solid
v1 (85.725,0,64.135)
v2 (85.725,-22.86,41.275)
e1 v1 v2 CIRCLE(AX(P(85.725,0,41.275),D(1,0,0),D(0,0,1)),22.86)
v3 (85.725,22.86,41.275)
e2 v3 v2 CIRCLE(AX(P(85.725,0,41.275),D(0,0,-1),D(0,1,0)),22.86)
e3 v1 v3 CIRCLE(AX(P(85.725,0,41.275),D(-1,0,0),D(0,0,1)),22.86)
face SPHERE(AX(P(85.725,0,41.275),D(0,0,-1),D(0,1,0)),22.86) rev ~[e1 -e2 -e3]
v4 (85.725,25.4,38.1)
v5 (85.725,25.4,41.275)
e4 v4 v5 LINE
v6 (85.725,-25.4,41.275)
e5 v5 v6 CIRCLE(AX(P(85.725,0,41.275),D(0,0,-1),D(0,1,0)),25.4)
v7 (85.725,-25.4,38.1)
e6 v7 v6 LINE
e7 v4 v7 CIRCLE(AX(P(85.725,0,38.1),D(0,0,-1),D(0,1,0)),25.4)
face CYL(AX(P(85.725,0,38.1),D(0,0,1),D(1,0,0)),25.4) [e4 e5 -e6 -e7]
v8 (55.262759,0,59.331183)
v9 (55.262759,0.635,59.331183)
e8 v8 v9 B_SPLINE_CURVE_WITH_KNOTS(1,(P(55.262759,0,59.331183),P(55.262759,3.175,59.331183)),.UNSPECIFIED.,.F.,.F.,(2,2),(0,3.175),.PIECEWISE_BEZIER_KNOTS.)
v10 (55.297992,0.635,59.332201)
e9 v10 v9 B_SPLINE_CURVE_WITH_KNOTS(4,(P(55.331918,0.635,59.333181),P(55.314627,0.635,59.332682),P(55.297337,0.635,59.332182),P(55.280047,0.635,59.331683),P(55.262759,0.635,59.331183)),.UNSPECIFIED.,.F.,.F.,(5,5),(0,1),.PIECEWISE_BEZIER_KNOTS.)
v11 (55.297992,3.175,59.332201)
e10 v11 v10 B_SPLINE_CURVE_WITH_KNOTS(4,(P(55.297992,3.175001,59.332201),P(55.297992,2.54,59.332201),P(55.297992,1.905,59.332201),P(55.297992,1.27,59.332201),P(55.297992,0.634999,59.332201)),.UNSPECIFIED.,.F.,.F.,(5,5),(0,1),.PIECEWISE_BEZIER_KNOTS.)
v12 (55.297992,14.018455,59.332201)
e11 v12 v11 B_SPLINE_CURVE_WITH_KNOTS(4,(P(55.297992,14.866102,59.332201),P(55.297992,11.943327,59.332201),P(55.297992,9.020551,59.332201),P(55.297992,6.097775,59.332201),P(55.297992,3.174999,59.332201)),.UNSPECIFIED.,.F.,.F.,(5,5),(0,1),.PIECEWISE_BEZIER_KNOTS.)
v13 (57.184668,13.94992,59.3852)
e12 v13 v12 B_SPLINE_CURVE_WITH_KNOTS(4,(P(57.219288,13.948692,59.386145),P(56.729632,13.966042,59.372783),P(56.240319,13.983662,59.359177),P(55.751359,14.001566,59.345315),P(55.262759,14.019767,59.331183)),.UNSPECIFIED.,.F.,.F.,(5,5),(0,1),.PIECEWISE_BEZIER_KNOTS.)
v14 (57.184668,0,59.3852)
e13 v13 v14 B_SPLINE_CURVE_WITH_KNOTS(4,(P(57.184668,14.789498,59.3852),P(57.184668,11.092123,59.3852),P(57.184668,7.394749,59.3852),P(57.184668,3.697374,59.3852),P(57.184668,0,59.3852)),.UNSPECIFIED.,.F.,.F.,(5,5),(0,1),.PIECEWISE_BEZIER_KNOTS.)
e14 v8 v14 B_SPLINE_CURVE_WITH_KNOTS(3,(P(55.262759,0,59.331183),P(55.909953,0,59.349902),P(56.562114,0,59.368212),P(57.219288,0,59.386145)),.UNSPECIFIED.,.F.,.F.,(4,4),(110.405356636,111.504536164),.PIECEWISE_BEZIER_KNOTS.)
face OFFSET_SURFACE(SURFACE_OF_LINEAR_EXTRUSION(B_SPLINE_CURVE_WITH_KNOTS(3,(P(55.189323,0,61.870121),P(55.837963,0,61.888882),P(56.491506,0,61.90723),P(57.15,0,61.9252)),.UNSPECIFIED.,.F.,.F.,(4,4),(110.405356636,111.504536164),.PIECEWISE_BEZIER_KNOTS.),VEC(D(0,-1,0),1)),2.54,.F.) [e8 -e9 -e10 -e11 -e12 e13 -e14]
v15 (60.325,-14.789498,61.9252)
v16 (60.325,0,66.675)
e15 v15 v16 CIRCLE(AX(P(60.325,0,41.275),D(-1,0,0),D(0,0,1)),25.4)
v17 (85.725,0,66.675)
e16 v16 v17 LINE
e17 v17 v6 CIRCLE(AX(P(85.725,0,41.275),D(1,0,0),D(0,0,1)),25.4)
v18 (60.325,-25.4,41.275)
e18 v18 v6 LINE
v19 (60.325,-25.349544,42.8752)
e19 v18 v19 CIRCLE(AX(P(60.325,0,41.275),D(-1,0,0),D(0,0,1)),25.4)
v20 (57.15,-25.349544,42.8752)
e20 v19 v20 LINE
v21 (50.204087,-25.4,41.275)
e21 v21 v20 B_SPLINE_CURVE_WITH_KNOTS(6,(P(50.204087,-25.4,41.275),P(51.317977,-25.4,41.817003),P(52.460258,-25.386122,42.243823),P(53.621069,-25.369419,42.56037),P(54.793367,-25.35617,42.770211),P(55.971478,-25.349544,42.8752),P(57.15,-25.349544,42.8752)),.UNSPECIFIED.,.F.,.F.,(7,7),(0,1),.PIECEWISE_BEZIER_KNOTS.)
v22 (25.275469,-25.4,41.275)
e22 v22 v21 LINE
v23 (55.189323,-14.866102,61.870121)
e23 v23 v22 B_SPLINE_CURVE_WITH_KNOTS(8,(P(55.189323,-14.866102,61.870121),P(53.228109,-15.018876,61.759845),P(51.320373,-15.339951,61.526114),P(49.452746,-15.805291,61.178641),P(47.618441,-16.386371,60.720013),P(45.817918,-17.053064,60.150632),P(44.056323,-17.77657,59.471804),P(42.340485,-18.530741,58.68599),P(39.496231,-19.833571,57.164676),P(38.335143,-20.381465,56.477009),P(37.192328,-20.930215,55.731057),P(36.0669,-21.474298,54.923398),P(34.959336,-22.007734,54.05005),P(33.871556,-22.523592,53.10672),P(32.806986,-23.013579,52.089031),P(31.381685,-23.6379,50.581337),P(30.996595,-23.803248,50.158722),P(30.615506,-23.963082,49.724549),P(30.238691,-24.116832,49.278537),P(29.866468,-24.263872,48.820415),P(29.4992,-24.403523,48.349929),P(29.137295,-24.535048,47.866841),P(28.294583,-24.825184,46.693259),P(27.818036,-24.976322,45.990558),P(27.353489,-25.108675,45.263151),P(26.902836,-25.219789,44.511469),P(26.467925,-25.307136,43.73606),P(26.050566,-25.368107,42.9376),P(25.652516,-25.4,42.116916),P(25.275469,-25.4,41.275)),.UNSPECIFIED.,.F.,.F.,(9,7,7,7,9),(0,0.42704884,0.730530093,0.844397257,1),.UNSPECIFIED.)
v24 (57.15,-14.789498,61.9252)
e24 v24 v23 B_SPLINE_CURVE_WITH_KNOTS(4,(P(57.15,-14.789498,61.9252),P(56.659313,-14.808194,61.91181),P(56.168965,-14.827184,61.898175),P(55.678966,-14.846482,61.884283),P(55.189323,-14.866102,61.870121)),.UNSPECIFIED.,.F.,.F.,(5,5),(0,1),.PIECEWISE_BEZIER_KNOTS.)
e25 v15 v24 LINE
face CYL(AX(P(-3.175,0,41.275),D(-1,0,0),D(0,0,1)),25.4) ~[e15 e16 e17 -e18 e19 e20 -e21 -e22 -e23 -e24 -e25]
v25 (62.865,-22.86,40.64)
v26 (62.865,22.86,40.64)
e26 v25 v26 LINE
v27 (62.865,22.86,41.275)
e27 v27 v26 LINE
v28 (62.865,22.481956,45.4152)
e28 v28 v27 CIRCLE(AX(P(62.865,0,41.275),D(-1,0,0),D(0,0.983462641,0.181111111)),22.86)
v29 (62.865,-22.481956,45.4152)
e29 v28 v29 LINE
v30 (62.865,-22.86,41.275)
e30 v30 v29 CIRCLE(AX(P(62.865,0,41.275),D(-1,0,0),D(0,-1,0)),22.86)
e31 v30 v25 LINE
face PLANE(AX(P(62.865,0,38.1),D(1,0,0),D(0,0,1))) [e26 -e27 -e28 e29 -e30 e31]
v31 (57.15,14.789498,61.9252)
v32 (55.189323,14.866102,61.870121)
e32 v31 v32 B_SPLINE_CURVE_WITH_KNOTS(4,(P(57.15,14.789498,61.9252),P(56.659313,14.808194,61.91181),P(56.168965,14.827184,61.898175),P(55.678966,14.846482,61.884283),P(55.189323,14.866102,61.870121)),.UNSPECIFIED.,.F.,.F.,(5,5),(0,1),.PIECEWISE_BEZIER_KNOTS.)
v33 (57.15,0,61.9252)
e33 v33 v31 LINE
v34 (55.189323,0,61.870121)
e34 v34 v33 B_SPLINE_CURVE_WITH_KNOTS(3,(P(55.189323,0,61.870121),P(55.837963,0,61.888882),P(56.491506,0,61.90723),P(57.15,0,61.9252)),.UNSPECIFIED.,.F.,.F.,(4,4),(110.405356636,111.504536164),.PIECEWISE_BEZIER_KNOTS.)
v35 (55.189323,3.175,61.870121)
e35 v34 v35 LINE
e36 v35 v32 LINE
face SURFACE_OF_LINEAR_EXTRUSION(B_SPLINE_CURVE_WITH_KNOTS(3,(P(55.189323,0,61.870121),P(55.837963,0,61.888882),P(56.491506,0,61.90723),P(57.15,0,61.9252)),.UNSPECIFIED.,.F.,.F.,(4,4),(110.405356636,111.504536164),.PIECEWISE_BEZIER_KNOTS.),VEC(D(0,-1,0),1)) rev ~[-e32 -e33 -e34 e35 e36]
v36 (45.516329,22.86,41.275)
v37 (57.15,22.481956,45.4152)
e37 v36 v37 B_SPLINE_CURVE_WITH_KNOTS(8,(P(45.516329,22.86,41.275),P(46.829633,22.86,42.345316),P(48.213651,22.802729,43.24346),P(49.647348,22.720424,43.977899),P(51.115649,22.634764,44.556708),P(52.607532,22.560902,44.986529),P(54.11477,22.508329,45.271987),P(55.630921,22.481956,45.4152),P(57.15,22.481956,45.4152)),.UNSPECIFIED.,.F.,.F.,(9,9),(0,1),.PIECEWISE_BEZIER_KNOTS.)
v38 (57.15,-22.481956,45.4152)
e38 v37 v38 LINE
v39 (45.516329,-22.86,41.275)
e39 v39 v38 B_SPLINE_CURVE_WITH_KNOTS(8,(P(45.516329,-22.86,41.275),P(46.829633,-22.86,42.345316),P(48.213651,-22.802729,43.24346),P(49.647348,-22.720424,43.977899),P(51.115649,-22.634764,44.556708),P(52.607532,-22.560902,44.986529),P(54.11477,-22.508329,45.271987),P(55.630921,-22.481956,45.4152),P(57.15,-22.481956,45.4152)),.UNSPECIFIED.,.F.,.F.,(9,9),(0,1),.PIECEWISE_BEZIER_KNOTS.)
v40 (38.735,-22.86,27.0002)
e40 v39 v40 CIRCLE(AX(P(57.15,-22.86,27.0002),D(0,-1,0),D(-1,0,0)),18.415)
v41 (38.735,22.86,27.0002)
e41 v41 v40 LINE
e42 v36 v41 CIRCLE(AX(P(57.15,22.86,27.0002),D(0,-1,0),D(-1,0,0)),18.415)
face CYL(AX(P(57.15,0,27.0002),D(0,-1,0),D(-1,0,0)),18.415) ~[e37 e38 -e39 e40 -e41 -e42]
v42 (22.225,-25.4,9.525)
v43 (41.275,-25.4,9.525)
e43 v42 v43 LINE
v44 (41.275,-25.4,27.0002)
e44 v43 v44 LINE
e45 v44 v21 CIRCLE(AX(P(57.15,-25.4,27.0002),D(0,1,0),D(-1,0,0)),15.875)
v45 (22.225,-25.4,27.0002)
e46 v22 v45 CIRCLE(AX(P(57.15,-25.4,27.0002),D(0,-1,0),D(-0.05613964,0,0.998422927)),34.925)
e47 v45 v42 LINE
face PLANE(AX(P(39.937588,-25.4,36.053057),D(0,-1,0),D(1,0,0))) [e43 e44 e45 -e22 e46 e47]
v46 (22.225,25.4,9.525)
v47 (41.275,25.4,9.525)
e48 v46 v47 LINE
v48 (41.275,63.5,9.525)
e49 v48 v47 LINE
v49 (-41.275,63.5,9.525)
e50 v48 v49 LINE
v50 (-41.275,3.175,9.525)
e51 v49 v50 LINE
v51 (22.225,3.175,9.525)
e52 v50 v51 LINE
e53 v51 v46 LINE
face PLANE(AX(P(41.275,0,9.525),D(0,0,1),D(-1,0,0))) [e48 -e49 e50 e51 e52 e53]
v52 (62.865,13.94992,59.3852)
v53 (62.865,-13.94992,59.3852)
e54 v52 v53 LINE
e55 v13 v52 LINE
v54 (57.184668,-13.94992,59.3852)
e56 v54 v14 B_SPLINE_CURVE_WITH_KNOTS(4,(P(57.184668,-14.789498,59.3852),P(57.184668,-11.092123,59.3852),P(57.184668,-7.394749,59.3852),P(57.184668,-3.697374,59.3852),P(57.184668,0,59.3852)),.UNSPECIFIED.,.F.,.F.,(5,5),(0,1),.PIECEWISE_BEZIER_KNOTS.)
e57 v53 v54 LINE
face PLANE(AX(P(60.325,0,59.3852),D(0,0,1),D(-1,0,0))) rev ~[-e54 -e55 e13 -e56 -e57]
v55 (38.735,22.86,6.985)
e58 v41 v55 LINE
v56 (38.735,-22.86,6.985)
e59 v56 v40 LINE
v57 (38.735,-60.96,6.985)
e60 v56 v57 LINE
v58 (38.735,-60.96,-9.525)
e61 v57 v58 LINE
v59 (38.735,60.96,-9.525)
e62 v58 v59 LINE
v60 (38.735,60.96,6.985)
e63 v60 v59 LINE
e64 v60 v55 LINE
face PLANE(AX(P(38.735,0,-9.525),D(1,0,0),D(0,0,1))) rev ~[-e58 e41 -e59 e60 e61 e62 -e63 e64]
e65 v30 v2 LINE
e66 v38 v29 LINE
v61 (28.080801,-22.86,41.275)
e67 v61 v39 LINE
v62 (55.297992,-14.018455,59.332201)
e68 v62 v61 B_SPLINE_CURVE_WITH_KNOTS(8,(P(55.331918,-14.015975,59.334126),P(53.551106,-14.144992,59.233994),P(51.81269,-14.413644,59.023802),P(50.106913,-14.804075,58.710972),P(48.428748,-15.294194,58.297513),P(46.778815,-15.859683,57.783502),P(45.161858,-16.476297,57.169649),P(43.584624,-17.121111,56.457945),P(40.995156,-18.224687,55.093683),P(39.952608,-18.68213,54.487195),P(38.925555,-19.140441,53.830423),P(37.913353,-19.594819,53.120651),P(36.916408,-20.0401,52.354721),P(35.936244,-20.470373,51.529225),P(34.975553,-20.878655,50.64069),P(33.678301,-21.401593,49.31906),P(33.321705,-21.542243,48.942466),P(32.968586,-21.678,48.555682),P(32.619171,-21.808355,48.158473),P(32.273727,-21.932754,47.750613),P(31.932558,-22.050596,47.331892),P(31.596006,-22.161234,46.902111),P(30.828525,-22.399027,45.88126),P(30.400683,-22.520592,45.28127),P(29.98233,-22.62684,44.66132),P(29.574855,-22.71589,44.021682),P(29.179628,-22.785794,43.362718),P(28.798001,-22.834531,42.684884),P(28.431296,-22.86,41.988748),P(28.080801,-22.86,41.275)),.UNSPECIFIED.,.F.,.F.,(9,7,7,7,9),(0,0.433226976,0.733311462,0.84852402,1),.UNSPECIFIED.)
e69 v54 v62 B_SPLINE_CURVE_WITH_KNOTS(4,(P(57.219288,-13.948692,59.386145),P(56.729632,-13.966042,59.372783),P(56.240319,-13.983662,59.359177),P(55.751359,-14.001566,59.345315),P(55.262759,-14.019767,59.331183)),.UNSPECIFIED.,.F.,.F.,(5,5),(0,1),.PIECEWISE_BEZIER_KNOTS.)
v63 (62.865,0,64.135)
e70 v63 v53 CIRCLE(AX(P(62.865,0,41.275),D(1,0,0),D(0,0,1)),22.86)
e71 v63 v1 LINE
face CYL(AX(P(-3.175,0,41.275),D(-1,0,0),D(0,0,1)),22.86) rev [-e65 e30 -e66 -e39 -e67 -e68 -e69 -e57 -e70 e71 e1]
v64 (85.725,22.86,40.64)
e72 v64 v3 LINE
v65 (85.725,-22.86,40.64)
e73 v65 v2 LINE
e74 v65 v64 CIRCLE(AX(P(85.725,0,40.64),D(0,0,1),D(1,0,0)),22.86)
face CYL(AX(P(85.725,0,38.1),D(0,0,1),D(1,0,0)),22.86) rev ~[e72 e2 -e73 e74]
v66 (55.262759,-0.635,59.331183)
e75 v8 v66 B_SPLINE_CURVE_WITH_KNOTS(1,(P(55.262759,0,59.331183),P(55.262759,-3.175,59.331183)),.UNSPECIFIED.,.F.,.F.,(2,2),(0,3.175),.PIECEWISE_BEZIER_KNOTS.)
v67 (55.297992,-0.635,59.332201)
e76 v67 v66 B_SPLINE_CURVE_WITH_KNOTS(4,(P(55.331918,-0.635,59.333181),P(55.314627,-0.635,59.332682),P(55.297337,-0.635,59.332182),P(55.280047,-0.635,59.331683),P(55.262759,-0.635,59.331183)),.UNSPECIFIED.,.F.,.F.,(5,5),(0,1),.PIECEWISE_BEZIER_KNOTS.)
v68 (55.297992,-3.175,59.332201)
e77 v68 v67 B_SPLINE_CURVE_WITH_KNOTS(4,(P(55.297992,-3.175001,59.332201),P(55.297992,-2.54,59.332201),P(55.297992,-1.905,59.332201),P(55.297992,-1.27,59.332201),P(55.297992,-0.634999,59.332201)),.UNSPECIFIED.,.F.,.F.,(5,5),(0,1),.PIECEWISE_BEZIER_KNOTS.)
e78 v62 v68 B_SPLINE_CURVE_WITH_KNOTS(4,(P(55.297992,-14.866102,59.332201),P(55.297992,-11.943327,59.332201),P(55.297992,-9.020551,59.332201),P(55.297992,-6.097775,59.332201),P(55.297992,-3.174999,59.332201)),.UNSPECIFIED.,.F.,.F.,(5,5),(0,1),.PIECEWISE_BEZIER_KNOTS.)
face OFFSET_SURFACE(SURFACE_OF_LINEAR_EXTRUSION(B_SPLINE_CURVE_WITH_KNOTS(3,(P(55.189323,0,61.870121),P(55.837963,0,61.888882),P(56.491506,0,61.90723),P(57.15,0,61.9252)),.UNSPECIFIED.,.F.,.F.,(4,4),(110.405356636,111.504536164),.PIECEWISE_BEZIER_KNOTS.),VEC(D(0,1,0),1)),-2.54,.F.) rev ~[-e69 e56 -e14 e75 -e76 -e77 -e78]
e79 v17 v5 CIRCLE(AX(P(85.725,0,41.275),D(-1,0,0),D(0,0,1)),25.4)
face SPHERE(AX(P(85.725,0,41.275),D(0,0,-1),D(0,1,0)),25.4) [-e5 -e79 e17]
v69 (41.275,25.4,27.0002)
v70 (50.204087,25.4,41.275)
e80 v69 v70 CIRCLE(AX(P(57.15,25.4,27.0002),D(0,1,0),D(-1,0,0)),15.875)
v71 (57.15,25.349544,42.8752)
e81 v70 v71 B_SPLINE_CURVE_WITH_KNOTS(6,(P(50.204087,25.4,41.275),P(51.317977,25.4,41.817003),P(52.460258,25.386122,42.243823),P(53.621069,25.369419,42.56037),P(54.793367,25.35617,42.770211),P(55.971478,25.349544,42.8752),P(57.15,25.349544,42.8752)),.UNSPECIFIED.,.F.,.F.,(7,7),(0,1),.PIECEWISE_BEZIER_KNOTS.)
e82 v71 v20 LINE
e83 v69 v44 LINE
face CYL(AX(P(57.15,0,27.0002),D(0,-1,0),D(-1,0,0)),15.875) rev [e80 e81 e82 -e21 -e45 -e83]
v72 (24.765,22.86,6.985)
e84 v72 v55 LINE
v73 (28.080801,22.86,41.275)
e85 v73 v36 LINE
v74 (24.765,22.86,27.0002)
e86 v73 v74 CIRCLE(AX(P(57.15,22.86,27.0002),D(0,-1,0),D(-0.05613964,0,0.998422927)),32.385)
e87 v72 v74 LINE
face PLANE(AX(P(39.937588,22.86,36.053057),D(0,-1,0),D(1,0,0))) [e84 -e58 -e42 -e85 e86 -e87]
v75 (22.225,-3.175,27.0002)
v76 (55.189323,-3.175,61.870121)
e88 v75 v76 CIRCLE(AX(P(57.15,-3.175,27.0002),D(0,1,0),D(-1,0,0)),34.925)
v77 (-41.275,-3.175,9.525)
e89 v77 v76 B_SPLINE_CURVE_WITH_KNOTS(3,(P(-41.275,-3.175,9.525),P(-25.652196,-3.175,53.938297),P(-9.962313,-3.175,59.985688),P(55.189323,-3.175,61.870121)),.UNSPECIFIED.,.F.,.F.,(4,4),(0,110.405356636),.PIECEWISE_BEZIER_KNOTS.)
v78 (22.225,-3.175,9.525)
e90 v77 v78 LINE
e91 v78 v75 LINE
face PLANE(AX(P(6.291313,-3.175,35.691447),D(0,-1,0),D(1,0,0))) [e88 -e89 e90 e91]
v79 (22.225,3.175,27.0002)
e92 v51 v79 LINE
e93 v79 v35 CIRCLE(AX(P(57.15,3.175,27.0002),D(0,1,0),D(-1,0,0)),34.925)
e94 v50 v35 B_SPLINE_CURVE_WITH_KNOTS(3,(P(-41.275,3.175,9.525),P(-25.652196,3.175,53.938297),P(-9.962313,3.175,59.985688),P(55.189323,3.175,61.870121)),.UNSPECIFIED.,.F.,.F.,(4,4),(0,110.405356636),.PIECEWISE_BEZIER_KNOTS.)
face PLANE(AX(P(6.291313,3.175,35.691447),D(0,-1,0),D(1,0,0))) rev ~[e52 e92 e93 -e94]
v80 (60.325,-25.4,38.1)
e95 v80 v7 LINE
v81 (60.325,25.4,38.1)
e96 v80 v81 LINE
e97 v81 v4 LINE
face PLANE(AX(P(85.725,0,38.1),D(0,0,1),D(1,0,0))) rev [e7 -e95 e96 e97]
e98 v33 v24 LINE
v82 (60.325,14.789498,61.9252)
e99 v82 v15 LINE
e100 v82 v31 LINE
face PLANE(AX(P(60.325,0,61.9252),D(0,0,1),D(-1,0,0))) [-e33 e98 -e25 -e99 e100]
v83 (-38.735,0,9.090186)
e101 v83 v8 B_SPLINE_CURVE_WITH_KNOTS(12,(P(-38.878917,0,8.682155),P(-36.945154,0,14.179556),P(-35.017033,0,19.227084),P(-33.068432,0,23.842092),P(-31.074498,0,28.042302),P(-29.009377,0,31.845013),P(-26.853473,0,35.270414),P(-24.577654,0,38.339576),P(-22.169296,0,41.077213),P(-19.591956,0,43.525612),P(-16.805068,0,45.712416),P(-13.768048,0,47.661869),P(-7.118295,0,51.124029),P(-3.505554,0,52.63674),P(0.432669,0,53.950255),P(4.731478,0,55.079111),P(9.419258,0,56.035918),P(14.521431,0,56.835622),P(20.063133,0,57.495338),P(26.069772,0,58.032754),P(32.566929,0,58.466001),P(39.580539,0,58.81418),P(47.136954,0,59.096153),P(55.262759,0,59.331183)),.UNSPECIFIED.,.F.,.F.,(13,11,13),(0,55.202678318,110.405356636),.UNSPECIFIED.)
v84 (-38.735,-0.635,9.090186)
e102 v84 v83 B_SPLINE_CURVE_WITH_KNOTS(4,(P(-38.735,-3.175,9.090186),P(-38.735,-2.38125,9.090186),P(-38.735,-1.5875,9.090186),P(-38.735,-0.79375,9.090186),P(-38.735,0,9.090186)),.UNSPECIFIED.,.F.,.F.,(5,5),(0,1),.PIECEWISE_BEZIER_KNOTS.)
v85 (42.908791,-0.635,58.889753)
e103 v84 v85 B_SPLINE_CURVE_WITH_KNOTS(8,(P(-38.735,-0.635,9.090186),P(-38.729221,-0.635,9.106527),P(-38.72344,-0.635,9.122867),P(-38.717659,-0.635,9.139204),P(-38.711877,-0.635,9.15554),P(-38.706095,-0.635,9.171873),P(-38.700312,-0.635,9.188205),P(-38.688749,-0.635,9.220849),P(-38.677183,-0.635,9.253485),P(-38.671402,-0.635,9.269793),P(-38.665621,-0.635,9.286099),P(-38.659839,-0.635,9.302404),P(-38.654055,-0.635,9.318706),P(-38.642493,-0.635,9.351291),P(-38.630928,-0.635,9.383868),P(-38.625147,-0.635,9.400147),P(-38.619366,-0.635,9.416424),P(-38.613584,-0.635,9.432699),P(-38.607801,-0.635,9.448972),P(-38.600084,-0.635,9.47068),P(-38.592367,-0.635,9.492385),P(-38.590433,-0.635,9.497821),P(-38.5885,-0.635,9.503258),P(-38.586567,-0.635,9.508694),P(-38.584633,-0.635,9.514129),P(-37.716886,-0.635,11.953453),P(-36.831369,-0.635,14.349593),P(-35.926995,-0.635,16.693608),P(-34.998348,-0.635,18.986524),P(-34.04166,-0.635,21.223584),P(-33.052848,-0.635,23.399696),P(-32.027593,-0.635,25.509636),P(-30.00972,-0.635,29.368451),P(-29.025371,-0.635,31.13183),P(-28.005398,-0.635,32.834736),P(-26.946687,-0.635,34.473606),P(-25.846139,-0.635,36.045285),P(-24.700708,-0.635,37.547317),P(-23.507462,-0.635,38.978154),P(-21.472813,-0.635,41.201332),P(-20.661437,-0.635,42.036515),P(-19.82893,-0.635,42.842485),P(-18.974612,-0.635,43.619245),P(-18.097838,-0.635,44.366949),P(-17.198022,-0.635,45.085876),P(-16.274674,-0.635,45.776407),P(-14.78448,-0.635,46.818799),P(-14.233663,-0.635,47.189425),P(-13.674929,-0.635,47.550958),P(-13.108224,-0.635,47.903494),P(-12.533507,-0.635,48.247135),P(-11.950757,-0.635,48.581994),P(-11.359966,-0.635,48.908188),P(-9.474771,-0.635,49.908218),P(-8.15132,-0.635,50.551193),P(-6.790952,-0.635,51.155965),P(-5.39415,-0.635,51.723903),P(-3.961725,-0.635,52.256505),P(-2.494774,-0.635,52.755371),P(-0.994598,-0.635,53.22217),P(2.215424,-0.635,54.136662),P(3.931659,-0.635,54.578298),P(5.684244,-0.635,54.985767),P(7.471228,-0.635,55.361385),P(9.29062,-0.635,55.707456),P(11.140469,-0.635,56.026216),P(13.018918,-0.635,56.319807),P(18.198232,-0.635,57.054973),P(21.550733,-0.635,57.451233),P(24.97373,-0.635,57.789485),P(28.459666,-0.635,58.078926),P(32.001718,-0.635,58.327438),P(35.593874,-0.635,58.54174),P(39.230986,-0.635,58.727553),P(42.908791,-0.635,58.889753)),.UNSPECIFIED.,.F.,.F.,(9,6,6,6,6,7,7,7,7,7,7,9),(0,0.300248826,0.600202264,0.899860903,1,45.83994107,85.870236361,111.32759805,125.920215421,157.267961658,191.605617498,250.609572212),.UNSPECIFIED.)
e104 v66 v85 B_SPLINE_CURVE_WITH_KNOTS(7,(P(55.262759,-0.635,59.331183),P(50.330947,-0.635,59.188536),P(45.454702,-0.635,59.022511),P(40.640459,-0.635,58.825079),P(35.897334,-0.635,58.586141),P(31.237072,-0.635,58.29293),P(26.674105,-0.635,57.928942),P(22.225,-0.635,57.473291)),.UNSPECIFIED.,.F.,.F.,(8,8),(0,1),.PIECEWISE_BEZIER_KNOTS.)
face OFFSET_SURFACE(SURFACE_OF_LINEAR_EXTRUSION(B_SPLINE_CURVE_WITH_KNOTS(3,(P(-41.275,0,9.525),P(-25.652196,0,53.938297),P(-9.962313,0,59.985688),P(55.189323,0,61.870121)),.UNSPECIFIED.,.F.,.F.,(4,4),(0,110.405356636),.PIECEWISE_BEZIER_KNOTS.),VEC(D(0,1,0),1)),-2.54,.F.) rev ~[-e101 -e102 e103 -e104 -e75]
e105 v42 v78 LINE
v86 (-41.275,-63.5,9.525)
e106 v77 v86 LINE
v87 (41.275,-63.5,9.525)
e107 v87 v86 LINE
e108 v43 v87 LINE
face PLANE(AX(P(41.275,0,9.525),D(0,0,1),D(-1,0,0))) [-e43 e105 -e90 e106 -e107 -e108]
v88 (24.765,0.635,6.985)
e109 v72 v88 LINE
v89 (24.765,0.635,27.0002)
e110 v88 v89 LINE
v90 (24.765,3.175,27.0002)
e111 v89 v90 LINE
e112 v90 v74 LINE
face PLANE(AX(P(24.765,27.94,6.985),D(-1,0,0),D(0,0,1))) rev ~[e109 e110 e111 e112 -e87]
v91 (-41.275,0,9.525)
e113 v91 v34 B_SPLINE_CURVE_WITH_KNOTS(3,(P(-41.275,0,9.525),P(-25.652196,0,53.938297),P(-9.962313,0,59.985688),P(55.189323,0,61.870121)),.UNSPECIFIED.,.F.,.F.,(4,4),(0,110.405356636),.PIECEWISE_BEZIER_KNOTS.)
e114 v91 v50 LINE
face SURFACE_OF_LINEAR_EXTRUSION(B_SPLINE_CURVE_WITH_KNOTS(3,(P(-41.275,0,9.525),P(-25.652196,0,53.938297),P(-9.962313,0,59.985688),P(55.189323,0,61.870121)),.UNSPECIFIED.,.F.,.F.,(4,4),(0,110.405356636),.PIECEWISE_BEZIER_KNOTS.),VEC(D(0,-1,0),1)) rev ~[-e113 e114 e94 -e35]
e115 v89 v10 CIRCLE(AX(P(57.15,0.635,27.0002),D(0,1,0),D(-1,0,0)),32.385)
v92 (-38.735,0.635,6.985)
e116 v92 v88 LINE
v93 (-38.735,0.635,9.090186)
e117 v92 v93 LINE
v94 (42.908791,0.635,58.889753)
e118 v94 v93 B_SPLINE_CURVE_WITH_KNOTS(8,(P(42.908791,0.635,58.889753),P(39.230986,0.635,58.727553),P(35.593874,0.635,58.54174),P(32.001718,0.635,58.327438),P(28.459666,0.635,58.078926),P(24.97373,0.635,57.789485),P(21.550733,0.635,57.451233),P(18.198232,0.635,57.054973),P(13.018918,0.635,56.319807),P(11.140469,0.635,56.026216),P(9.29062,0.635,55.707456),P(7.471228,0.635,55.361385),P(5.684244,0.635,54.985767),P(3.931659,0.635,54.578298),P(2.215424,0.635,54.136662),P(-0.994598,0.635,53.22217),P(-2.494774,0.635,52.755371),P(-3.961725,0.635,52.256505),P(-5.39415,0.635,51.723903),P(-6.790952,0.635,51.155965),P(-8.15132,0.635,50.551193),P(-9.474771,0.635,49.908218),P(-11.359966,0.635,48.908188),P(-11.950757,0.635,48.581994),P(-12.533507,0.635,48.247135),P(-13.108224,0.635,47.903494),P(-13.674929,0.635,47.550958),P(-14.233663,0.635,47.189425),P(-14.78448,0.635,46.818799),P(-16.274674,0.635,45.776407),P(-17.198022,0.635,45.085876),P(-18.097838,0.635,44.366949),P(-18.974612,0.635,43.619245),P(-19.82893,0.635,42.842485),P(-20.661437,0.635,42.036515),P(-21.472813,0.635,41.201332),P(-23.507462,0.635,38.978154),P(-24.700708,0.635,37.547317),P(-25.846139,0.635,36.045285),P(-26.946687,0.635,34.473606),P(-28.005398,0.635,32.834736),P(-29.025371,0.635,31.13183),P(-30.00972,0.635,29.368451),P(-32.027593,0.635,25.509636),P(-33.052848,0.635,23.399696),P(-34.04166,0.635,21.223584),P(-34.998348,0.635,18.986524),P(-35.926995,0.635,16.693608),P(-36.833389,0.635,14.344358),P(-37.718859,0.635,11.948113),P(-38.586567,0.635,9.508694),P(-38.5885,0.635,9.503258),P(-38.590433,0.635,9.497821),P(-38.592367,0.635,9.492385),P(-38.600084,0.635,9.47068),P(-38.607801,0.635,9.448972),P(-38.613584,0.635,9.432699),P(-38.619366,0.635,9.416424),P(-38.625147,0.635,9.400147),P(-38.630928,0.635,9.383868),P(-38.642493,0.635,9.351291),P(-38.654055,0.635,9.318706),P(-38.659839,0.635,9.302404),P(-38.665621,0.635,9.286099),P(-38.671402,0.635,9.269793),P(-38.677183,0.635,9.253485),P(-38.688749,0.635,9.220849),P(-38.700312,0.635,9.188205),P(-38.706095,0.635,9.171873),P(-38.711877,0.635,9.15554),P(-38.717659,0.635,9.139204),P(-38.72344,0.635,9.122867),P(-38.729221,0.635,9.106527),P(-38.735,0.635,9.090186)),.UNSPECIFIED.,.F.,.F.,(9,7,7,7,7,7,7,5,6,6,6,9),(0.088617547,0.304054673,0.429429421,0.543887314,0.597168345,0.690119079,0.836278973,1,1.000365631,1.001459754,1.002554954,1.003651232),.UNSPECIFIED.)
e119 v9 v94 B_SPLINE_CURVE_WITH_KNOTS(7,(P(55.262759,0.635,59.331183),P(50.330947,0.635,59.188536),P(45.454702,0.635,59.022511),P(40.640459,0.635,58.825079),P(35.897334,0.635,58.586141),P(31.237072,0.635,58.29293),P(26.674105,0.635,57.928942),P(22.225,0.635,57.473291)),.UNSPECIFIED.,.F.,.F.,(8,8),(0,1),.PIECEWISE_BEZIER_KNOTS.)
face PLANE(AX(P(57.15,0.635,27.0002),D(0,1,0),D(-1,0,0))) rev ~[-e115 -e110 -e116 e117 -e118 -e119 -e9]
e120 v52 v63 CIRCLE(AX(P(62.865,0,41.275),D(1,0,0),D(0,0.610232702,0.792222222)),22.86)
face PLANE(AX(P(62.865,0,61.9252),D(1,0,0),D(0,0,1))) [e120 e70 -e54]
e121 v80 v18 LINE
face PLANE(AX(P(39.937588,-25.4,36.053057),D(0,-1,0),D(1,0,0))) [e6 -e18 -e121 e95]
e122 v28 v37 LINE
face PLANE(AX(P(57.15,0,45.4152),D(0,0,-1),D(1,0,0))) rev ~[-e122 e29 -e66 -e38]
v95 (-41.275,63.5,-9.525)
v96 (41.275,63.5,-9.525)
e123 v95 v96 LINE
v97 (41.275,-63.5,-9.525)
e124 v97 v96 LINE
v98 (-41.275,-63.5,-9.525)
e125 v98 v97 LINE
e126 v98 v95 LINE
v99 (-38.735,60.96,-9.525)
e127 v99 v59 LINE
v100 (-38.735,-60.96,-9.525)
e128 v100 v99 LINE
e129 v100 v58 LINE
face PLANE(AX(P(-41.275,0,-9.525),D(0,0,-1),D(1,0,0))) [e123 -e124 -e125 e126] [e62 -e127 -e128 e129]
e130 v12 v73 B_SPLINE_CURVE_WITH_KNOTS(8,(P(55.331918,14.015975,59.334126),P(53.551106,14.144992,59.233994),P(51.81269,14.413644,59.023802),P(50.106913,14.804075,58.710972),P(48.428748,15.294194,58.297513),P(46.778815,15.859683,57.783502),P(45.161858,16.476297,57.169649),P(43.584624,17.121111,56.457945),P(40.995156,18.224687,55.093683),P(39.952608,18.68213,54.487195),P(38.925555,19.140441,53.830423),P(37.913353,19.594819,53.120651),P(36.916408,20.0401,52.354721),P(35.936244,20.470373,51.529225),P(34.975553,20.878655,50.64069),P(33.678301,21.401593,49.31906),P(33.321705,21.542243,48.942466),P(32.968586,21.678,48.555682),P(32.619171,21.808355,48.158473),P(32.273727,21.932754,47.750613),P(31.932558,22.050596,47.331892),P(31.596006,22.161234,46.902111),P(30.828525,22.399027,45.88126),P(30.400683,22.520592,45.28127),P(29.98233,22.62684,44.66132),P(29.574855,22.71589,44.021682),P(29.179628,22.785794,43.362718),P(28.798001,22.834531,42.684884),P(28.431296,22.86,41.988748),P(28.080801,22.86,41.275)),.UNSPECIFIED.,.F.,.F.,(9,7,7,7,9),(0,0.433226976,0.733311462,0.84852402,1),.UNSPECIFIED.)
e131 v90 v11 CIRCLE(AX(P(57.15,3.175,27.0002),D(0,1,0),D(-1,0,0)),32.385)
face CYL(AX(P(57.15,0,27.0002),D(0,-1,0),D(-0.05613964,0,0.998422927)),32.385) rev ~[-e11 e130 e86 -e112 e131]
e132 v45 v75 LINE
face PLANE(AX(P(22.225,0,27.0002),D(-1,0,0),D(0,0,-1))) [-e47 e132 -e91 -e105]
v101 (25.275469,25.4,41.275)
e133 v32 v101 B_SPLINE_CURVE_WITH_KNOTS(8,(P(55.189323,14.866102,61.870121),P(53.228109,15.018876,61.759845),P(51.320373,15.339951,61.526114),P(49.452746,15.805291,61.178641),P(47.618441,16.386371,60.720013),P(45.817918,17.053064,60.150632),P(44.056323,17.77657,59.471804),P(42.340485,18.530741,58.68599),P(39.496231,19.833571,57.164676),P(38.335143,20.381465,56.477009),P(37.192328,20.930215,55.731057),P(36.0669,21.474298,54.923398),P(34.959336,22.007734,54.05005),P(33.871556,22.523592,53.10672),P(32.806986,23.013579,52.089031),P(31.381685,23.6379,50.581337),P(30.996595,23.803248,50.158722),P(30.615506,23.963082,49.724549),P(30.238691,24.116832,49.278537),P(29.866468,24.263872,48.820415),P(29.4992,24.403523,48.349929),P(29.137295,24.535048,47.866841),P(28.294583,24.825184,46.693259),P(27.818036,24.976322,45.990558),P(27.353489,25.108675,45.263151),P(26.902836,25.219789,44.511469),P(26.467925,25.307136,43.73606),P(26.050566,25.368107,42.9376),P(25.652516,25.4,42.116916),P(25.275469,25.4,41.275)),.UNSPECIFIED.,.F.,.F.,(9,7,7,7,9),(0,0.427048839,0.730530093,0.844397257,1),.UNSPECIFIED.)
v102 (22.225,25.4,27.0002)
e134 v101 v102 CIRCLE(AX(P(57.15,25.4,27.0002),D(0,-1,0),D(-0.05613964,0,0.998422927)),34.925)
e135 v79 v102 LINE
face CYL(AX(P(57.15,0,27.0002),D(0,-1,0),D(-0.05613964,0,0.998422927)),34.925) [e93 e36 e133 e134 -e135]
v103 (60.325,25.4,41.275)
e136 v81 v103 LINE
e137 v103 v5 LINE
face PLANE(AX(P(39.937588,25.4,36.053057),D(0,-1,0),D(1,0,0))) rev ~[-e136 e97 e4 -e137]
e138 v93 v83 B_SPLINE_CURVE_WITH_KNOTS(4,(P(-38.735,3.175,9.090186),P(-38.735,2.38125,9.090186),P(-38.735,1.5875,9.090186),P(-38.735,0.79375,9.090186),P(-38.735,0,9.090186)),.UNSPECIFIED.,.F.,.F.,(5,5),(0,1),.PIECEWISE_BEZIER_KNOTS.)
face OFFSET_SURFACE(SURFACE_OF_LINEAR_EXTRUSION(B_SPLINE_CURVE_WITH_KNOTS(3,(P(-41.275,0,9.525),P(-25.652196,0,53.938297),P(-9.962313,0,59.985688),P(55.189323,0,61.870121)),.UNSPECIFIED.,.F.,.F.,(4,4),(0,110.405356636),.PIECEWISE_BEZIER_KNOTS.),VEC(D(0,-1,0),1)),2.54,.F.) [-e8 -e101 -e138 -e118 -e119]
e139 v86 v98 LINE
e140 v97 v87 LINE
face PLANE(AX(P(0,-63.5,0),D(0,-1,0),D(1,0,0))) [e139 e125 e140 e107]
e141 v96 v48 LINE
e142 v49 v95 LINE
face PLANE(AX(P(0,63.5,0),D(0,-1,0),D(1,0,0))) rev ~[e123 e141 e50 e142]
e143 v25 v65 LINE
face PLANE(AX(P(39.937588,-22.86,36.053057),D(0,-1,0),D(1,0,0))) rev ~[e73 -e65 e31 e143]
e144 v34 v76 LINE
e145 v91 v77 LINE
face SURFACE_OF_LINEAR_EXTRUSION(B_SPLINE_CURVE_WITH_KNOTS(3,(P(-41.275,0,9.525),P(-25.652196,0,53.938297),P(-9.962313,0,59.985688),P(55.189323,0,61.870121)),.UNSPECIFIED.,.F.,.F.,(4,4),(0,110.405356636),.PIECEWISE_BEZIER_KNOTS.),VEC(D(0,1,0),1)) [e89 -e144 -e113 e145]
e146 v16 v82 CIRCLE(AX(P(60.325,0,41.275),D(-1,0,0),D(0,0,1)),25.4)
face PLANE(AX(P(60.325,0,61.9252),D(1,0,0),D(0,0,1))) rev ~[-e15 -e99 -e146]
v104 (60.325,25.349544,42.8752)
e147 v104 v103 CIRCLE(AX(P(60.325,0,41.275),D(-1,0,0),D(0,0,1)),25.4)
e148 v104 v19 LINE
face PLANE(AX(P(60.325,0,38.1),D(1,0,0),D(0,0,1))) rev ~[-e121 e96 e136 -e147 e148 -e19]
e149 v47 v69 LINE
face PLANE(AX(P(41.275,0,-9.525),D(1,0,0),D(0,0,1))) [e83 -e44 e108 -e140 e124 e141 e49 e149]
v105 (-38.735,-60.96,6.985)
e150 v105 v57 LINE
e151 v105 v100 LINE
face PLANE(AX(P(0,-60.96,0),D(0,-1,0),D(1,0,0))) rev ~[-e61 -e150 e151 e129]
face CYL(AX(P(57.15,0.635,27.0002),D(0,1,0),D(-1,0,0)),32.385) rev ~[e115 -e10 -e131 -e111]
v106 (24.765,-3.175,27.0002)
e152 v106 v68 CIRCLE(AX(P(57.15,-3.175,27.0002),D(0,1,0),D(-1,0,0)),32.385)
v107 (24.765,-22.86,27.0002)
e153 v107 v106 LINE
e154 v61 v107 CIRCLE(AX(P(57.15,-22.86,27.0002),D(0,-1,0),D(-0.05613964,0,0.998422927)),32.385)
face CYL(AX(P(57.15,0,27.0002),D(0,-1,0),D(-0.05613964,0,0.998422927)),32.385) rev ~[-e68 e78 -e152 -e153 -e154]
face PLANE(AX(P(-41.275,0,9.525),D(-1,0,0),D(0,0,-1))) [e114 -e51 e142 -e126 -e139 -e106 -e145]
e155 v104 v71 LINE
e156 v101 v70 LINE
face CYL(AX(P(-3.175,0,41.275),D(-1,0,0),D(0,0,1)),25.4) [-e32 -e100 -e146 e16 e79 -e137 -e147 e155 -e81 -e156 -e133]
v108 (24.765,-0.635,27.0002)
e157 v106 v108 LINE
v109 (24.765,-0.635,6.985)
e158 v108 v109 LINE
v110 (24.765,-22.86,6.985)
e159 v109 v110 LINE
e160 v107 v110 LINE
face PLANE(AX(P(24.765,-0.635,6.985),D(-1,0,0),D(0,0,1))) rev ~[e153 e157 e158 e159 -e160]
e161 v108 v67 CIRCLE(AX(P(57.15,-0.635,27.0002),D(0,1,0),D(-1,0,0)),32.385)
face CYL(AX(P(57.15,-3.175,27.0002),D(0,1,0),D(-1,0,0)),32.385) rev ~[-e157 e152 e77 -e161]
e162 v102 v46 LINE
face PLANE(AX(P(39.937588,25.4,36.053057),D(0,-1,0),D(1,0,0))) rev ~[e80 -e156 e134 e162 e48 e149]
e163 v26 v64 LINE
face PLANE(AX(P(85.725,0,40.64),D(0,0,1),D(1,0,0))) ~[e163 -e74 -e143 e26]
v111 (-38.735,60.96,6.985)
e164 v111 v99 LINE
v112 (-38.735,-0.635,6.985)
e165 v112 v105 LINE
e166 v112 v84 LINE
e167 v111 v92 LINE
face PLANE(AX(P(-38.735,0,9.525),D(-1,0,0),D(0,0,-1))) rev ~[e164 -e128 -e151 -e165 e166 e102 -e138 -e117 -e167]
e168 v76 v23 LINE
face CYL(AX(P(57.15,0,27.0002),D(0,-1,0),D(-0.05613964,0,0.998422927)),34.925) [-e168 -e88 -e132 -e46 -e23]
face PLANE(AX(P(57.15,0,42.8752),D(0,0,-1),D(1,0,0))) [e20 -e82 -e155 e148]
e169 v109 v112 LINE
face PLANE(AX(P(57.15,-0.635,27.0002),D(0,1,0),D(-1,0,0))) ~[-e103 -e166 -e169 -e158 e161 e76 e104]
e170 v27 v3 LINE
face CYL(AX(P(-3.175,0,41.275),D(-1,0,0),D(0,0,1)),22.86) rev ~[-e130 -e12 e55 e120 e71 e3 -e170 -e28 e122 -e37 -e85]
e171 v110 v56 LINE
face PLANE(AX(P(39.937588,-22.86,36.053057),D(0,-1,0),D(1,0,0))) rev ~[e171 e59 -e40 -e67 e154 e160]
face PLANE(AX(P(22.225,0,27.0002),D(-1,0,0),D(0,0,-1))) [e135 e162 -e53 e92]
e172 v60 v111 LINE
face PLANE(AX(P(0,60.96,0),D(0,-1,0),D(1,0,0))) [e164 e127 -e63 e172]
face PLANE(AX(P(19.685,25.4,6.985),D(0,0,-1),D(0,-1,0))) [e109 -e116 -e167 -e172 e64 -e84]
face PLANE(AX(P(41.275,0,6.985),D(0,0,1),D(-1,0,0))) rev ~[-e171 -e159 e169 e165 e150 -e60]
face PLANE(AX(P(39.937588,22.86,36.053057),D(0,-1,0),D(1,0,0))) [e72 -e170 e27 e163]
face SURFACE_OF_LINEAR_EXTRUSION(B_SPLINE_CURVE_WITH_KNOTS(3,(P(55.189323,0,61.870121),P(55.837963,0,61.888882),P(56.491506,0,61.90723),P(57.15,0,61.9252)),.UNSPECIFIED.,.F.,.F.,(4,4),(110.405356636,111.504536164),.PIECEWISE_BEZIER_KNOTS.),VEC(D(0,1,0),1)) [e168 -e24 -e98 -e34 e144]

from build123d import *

# Parameters (mm, degrees)
F1_DEPTH     = 63.5
F0_W         = 25.4
F0_H         = 19.05
F0_H_2       = 4.7752
F0_H_3       = 4.7498
F2_DEPTH     = 25.4
F3_DEPTH     = 3.175
F5_T1_DEPTH  = 88.9
F5_T4_ANGLE  = 180
F6_T         = 2.54
F6_T3_DEPTH  = 24.13
F6_T5_DEPTH  = 27.305
F6_T7_DEPTH  = 68.58
F6_T9_DEPTH  = 27.305
F6_T11_DEPTH = 22.5552
F6_T13_DEPTH = 55.7790871697
F6_T15_DEPTH = 34.6589952471
F6_T18_ANGLE = 86.7817435726
F6_T20_ANGLE = 86.7817435726


# Not quite as in the source:
# - a fillet or chamfer that OpenCascade refuses, or shapes differently, is made with other operations: its cross-section is extruded or revolved along the edge and cut away or added
# - a shell that OpenCascade refuses in one call is made with other operations: the cavity is built on its own and cut out


with BuildPart() as f1:
    # F0 (on Front) → F1 (new body, symmetric)
    with BuildSketch(Plane.XZ):
        Polygon((41.275, -9.525), (41.275, 9.525), (22.225, 9.525), (-41.275, 9.525), (-41.275, -9.525), align=None)
    extrude(amount=F1_DEPTH, both=True)

    # F0 (on Front) → F2 (join, symmetric)
    with BuildSketch(Plane.XZ):
        with BuildLine():
            Line((22.225, 9.525), (41.275, 9.525))
            Line((41.275, 9.525), (41.275, 27.0002))
            ThreePointArc((41.275, 27.0002), (45.9246798487, 38.2255201513), (57.15, 42.8752))
            Line((57.15, 42.8752), (60.325, 42.8752))
            Line((60.325, 42.8752), (60.325, 61.9252))
            Line((60.325, 61.9252), (57.15, 61.9252))
            add(Edge.make_bspline(
                [(55.1893230691, 61.8701207193), (55.8379631981, 61.8888818572), (56.4915059272, 61.9072303668), (57.15, 61.9252)],
                knots=[110.4053566359, 110.4053566359, 110.4053566359, 110.4053566359, 111.5045361635, 111.5045361635, 111.5045361635, 111.5045361635], degree=3))
            ThreePointArc((55.1893230691, 61.8701207193), (31.7705568736, 50.9926882326), (22.225, 27.0002))
            Line((22.225, 27.0002), (22.225, 9.525))
        make_face()
        with Locations((73.025, 52.4002)):
            Rectangle(F0_W, F0_H)
        with Locations((73.025, 40.4876)):
            Rectangle(F0_W, F0_H_2)
        with Locations((73.025, 64.3001)):
            Rectangle(F0_W, F0_H_3)
    extrude(amount=F2_DEPTH, both=True)

    # F0 (on Front) → F3 (join, symmetric)
    with BuildSketch(Plane.XZ):
        with BuildLine():
            Line((-41.275, 9.525), (22.225, 9.525))
            Line((22.225, 9.525), (22.225, 27.0002))
            ThreePointArc((22.225, 27.0002), (31.7705568736, 50.9926882326), (55.1893230691, 61.8701207193))
            add(Edge.make_bspline(
                [(-41.275, 9.525), (-25.6521962788, 53.9382967597), (-9.9623131958, 59.9856877717), (55.1893230691, 61.8701207193)],
                knots=[0, 0, 0, 0, 110.4053566359, 110.4053566359, 110.4053566359, 110.4053566359], degree=3))
        make_face()
    extrude(amount=F3_DEPTH, both=True)

    # F0 (on Front) → F4 (revolve)
    with BuildSketch(Plane.XZ):
        Polygon((85.725, 61.9252), (85.725, 42.8752), (85.725, 38.1), (111.125, 38.1), (111.125, 66.675), (85.725, 66.675), align=None)
    revolve(axis=Axis((85.725, 0, 52.3875), (0, 0, 1)))

    # F5: fillet of radius 25.4 on 1 edges, made by hand

    # F5_s2 → F5_t1 (cut)
    with BuildSketch(Plane.YZ.offset(-3.175)):
        with BuildLine():
            ThreePointArc((0, 66.675), (17.9605122421, 59.2355122421), (25.4, 41.275))
            Line((25.4, 41.275), (25.4, 66.675))
            Line((25.4, 66.675), (0, 66.675))
        make_face()
        with BuildLine():
            ThreePointArc((0, 66.675), (-17.9605122421, 59.2355122421), (-25.4, 41.275))
            Line((-25.4, 41.275), (-25.4, 66.675))
            Line((-25.4, 66.675), (0, 66.675))
        make_face()
    extrude(amount=F5_T1_DEPTH, mode=Mode.SUBTRACT)

    # F5_s3 → F5_t4 (revolve, cut)
    with BuildSketch(Plane.YZ.offset(85.725)):
        with BuildLine():
            ThreePointArc((0, 66.675), (17.9605122421, 59.2355122421), (25.4, 41.275))
            Line((25.4, 41.275), (25.4, 66.675))
            Line((25.4, 66.675), (0, 66.675))
        make_face()
    revolve(axis=Axis((85.725, 0, 66.675), (0, 0, -1)), revolution_arc=F5_T4_ANGLE, mode=Mode.SUBTRACT)

    # F6: shell of thickness 2.54, made by hand


with BuildPart() as f6_core1:
    # F6_t2: copy of F1
    add(f1.part)

    # the walls: a layer under each face that stays
    f6_faces = [f6_core1.faces().sort_by_distance(p)[0] for p in [
        (41.275, 0, 8.7376),
        (0, 63.5, 0),
        (0, 33.3375, 9.525),
        (36.214543408, 25.4, 25.4),
        (45.9246798487, 0, 38.2255201513),
        (36.214543408, -25.4, 25.4),
        (0, -33.3375, 9.525),
        (0, -63.5, 0),
        (-41.275, 0, 0),
        (22.225, 14.2875, 18.2626),
        (6.9571615345, 3.175, 35.6975603597),
        (31.7705568736, 14.2875, 50.9926882326),
        (55.5002346295, 17.9605122421, 59.2355122421),
        (55.5002346295, -17.9605122421, 59.2355122421),
        (58.7375, 0, 42.8752),
        (31.7705568736, -14.2875, 50.9926882326),
        (22.225, -14.2875, 18.2626),
        (6.9571615345, -3.175, 35.6975603597),
        (-11.6161506693, 1.5875, 51.6458842892),
        (-11.6161506693, -1.5875, 51.6458842892),
        (56.1659663056, 7.4330512334, 61.8979571739),
        (60.325, 0, 64.3001),
        (58.7375, 0, 61.9252),
        (60.325, 0, 40.4876),
        (73.025, 25.4, 39.6875),
        (103.6855122422, -1e-10, 59.2355122421),
        (56.1659663056, -7.4330512334, 61.8979571739),
        (73.025, -25.4, 39.6875),
        (85.725, 0, 38.1),
        (111.125, 0, 39.6875),
    ]]
    thicken(f6_faces, amount=-F6_T, mode=Mode.SUBTRACT)

    # F6_s4 → F6_t3 (cut)
    with BuildSketch(Plane.YZ.offset(19.685)):
        Polygon((25.4254, 9.5504), (25.4, 6.985), (22.86, 6.985), (22.86, 9.525), align=None)
        Polygon((-25.4254, 9.5504), (-22.86, 9.525), (-22.86, 6.985), (-25.4, 6.985), align=None)
    extrude(amount=F6_T3_DEPTH, mode=Mode.SUBTRACT)

    # F6_s6 → F6_t5 (cut)
    with BuildSketch(Plane.XZ.offset(-27.94)):
        Polygon((22.1996, 9.5504), (22.225, 6.985), (24.765, 6.985), (24.765, 9.525), align=None)
    extrude(amount=F6_T5_DEPTH, mode=Mode.SUBTRACT)

    # F6_s8 → F6_t7 (cut)
    with BuildSketch(Plane.YZ.offset(-43.815)):
        Polygon((3.2004, 9.5504), (3.175, 6.985), (0.635, 6.985), (0.635, 9.525), align=None)
        Polygon((-3.2004, 9.5504), (-3.175, 6.985), (-0.635, 6.985), (-0.635, 9.525), align=None)
    extrude(amount=F6_T7_DEPTH, mode=Mode.SUBTRACT)

    # F6_s10 → F6_t9 (cut)
    with BuildSketch(Plane.XZ.offset(0.635)):
        Polygon((22.1996, 9.5504), (22.225, 6.985), (24.765, 6.985), (24.765, 9.525), align=None)
    extrude(amount=F6_T9_DEPTH, mode=Mode.SUBTRACT)

    # F6_s12 → F6_t11 (cut)
    with BuildSketch(Plane.XY.offset(6.985)):
        Polygon((22.1996, 3.2004), (24.765, 3.175), (24.765, 0.635), (22.225, 0.635), align=None)
        Polygon((22.1996, -3.2004), (24.765, -3.175), (24.765, -0.635), (22.225, -0.635), align=None)
    extrude(amount=F6_T11_DEPTH, mode=Mode.SUBTRACT)

    # F6_s14 → F6_t13 (cut)
    with BuildSketch(Plane.XZ.offset(-27.8895435848)):
        Polygon((60.2996, 42.8498), (60.325, 45.4152), (62.865, 45.4152), (62.865, 42.8752), align=None)
    extrude(amount=F6_T13_DEPTH, mode=Mode.SUBTRACT)

    # F6_s16 → F6_t15 (cut)
    with BuildSketch(Plane.XZ.offset(-17.3294976236)):
        Polygon((60.2996, 61.9506), (62.865, 61.9252), (62.865, 59.3852), (60.325, 59.3852), align=None)
    extrude(amount=F6_T15_DEPTH, mode=Mode.SUBTRACT)

    # F6_s17 → F6_t18 (revolve, cut)
    with BuildSketch(Plane.XY.offset(27.0002)):
        Polygon((22.1996, 3.2004), (22.225, 0.635), (24.765, 0.635), (24.765, 3.175), align=None)
    revolve(axis=Axis((57.15, 3.175, 27.0002), (0, 1, 0)), revolution_arc=F6_T18_ANGLE, mode=Mode.SUBTRACT)

    # F6_s19 → F6_t20 (revolve, cut)
    with BuildSketch(Plane.XY.offset(27.0002)):
        Polygon((22.1996, -3.2004), (24.765, -3.175), (24.765, -0.635), (22.225, -0.635), align=None)
    revolve(axis=Axis((57.15, -3.175, 27.0002), (0, 1, 0)), revolution_arc=F6_T20_ANGLE, mode=Mode.SUBTRACT)


with BuildPart() as f1_1:
    add(f1.part)

    # what is left inside the walls is the cavity
    f6_cavity = [f6_core1.part.solids().sort_by_distance(p)[0] for p in [
        (0, 20.32, -9.4996),
    ]]
    add(f6_cavity, mode=Mode.SUBTRACT)


solid = f1_1.part
